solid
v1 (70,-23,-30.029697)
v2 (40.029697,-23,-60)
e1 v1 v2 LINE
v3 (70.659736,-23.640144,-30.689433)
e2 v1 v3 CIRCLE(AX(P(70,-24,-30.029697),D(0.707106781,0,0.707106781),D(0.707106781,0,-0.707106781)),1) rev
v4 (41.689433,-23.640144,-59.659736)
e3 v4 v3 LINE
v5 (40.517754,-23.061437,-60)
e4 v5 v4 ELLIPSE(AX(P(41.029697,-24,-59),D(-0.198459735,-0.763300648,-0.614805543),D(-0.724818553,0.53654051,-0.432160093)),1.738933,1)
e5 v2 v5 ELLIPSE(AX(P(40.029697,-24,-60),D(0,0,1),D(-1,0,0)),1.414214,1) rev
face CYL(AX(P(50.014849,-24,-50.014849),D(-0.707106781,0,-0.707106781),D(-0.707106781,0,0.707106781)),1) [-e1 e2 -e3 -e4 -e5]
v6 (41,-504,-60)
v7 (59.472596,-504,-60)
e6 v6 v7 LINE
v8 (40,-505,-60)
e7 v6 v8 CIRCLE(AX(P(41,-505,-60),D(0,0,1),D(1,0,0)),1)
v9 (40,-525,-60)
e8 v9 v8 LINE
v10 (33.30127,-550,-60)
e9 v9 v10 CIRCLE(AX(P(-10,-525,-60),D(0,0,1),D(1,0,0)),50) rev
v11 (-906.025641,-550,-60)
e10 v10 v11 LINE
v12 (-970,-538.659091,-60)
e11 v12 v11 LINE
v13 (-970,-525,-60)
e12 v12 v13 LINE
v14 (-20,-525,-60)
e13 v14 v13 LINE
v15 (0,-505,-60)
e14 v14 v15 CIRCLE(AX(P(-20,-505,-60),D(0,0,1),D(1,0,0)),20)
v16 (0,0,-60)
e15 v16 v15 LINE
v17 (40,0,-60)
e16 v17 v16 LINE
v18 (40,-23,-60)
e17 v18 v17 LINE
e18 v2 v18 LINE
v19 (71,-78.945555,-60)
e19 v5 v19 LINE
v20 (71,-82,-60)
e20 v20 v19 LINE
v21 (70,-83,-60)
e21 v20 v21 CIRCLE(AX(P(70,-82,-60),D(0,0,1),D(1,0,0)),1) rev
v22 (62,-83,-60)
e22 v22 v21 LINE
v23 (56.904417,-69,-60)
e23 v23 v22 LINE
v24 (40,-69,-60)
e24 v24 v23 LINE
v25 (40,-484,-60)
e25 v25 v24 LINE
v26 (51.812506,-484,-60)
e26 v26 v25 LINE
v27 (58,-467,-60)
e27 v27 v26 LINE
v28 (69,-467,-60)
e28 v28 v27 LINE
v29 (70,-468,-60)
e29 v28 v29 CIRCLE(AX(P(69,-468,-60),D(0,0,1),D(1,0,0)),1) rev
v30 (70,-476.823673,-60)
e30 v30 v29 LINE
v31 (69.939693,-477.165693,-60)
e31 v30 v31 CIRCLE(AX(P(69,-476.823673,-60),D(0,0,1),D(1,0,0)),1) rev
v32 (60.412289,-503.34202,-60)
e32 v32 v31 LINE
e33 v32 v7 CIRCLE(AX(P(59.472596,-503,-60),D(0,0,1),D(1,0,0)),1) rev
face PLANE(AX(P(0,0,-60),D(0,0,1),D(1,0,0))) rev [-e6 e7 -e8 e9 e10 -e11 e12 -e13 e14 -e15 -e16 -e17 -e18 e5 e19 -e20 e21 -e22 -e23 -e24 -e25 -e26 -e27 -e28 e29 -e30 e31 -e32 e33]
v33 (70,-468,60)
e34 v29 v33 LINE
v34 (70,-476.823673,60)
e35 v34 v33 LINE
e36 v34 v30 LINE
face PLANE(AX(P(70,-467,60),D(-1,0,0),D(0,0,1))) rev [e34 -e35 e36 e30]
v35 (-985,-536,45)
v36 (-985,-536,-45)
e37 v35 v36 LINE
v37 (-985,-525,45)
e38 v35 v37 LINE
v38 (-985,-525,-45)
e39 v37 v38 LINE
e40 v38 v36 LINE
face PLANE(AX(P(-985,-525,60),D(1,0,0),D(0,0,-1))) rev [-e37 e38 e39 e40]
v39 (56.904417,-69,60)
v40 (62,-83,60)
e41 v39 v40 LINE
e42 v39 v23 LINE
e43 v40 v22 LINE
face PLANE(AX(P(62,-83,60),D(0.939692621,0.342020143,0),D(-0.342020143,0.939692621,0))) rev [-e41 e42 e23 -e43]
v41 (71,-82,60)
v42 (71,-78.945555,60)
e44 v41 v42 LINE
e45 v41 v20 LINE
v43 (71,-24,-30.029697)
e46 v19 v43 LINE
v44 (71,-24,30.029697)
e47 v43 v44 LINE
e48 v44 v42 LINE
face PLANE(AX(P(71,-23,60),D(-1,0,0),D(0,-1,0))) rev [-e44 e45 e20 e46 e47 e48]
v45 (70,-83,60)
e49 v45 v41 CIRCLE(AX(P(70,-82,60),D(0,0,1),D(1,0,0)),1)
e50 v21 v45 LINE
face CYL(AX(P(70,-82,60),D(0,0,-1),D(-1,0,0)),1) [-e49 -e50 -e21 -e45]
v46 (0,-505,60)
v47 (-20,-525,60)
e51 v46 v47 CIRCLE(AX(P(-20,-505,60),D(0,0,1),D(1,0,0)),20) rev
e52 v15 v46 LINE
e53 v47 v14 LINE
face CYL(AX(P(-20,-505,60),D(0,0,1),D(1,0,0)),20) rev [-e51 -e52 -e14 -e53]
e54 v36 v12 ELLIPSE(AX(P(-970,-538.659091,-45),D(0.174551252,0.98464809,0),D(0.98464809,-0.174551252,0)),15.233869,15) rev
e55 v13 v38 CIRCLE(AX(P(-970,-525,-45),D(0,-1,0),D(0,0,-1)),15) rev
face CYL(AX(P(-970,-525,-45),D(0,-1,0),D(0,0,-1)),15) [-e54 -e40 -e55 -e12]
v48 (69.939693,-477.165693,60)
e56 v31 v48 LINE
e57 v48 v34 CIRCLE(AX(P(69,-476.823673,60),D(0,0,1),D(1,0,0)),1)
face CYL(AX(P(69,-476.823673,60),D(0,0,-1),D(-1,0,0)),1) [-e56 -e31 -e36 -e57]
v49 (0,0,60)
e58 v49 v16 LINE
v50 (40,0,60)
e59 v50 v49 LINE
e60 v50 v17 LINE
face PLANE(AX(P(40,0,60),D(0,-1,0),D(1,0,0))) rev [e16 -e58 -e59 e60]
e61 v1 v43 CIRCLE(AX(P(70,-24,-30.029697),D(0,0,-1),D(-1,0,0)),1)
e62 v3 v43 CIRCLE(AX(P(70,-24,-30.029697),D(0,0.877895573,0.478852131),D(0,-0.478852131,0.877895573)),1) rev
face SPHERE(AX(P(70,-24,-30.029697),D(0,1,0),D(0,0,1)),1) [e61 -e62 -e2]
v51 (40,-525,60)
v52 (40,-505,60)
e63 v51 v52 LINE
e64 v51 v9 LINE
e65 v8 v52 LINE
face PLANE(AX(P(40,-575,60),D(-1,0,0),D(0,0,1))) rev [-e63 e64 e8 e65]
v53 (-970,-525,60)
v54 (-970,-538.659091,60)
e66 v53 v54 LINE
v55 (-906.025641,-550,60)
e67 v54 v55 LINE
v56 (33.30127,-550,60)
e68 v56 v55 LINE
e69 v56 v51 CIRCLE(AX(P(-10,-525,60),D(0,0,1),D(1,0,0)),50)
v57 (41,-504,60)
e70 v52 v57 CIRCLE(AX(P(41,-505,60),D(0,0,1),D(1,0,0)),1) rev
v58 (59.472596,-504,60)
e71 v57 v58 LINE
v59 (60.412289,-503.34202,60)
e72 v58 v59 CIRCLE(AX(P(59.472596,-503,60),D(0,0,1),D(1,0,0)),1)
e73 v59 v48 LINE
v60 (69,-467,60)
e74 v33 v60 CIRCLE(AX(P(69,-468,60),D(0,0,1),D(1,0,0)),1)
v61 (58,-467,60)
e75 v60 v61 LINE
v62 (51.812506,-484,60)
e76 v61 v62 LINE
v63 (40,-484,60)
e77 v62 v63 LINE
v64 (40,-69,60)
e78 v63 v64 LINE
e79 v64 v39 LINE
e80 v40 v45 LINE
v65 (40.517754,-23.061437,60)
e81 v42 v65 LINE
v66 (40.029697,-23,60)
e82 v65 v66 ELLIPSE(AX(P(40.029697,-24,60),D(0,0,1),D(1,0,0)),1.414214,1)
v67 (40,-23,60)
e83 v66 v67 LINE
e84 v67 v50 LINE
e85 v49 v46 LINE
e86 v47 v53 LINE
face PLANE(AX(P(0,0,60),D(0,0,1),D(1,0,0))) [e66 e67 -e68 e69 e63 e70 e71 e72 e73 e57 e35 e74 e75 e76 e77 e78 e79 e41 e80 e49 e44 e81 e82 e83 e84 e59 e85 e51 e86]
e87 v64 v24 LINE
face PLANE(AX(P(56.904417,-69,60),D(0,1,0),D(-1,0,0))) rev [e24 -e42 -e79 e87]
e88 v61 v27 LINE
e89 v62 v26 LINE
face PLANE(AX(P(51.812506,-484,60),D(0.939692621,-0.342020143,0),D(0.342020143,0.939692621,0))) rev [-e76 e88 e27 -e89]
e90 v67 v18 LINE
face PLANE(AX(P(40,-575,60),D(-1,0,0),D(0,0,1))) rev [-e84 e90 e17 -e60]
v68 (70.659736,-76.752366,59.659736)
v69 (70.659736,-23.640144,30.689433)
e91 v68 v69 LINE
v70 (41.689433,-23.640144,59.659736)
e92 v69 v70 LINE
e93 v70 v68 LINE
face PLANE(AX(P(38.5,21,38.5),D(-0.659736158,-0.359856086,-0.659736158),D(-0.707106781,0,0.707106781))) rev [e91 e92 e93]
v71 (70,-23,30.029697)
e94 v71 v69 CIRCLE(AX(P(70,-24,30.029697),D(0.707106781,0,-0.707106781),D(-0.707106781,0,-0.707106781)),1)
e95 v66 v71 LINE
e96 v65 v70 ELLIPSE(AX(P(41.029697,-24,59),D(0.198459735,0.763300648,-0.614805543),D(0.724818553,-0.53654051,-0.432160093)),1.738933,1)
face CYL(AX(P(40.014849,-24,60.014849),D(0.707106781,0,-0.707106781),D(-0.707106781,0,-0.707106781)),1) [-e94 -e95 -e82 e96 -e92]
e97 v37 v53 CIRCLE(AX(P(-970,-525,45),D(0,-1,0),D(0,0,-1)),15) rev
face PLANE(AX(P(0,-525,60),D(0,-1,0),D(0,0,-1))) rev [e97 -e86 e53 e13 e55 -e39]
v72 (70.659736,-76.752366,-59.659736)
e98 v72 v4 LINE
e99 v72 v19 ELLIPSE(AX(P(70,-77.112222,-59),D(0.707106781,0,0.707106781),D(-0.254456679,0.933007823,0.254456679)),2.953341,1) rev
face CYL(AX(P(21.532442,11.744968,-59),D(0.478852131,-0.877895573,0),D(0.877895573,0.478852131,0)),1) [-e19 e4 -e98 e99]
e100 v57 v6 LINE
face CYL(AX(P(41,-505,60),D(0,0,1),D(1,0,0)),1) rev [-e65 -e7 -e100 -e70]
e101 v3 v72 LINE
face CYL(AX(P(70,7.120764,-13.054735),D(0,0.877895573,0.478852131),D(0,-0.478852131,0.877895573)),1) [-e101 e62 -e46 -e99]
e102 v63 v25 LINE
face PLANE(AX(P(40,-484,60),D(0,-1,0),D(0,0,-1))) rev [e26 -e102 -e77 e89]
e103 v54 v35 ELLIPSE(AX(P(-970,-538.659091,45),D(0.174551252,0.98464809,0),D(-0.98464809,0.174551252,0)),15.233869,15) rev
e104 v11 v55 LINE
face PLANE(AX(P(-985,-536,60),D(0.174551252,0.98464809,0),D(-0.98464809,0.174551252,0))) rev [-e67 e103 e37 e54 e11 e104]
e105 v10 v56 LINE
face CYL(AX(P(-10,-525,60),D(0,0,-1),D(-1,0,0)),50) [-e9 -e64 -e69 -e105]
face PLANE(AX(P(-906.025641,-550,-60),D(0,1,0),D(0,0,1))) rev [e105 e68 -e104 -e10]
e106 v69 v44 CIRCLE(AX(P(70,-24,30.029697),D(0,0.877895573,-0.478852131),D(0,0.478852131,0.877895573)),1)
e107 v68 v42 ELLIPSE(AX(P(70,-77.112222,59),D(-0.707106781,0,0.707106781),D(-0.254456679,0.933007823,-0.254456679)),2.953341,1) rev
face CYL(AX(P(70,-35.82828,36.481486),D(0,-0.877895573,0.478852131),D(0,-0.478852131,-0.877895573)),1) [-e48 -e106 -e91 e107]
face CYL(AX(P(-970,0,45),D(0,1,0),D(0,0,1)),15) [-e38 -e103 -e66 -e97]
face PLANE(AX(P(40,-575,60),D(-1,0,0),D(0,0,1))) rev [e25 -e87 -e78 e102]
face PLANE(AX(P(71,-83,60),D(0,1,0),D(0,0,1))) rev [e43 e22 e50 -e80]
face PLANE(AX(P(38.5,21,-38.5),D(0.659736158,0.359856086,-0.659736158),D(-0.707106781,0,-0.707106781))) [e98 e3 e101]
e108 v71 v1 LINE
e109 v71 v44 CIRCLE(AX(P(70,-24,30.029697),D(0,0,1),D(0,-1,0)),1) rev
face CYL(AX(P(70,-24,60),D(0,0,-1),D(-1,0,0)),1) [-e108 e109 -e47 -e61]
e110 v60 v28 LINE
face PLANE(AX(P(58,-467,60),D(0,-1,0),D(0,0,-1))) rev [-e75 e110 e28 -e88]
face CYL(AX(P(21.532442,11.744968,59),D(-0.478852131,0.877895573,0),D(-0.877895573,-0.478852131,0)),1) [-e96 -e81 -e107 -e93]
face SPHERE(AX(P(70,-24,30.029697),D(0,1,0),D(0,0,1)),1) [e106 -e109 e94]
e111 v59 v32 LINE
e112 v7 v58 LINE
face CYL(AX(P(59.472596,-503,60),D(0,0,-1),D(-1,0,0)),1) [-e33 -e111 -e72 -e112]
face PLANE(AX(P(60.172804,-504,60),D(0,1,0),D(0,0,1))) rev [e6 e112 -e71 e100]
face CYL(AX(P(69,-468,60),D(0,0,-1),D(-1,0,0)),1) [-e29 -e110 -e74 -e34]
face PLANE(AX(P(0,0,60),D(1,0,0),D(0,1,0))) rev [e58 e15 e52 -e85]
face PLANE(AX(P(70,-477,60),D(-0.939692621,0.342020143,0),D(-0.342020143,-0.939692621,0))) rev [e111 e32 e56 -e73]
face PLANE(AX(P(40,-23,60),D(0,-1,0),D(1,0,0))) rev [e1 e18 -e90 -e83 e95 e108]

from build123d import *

# Parameters (mm, degrees)
BOSS_EXTRUDE1_DEPTH = 60
FILLET1_R           = 20
FILLET2_R           = 50
SKETCH2_W           = 946.025641026
SKETCH2_H           = 25
CUT_EXTRUDE1_DEPTH  = 1147.843494118
FILLET3_R           = 15
BOSS_EXTRUDE2_DEPTH = 60
CHAMFER1_START      = 58.356662002
CHAMFER1_OUTLINE_W  = 43
CHAMFER1_OUTLINE_H  = 66
CHAMFER1_DEPTH      = 20.643337998
CHAMFER2_START      = 58.356662002
CHAMFER2_OUTLINE_W  = 43
CHAMFER2_OUTLINE_H  = 66
CHAMFER2_DEPTH      = 20.643337998
FILLET4_R           = 1


with BuildPart() as part:
    # Sketch1 → Boss-Extrude1 (new, symmetric)
    with BuildSketch(Plane.XY):
        Polygon((0, 0), (0, -525), (-985, -525), (-985, -536), (-765, -575), (40, -575), (40, 0), align=None)
    extrude(amount=BOSS_EXTRUDE1_DEPTH, both=True)

    # Fillet1
    fillet1_edges = [part.edges().sort_by_distance(p)[0] for p in [
        (0, -525, 0),
    ]]
    fillet(fillet1_edges, radius=FILLET1_R)

    # Fillet2
    fillet2_edges = [part.edges().sort_by_distance(p)[0] for p in [
        (40, -575, 0),
    ]]
    fillet(fillet2_edges, radius=FILLET2_R)

    # Sketch2 → Cut-Extrude1 (cut, through all)
    with BuildSketch(Plane.XY.offset(60)):
        with Locations((-433.012820513, -562.5)):
            Rectangle(SKETCH2_W, SKETCH2_H)
    extrude(amount=-CUT_EXTRUDE1_DEPTH, mode=Mode.SUBTRACT)

    # Fillet3
    fillet3_edges = [part.edges().sort_by_distance(p)[0] for p in [
        (-985, -530.5, 60),
        (-985, -530.5, -60),
    ]]
    fillet(fillet3_edges, radius=FILLET3_R)

    # Sketch4 → Boss-Extrude2 (add, symmetric)
    with BuildSketch(Plane.XY):
        Polygon((40, -23), (71, -23), (71, -83), (62, -83), (56.90441672, -69), (40, -69), align=None)
        Polygon((40, -484), (51.812506017, -484), (58, -467), (70, -467), (70, -477), (60.172803675, -504), (40, -504), align=None)
    extrude(amount=BOSS_EXTRUDE2_DEPTH, both=True)

    # Chamfer1: read off the stored shape, not the designer's step
    # Chamfer1 outline → Chamfer1 (cut)
    with BuildSketch(Plane(origin=(0, 0, 0), x_dir=(0.7514973063417119, -0.31591606508632464, -0.5791794526582624), z_dir=(0.659736158294474, 0.35985608634244, 0.659736158294474)).offset(CHAMFER1_START)):
        with Locations((23.5, -66)):
            Rectangle(CHAMFER1_OUTLINE_W, CHAMFER1_OUTLINE_H)
    extrude(amount=CHAMFER1_DEPTH, mode=Mode.SUBTRACT)

    # Chamfer2: read off the stored shape, not the designer's step
    # Chamfer2 outline → Chamfer2 (cut)
    with BuildSketch(Plane(origin=(0, 0, 0), x_dir=(0.7514973063417119, -0.31591606508632464, 0.5791794526582624), z_dir=(0.659736158294474, 0.35985608634244, -0.659736158294474)).offset(CHAMFER2_START)):
        with Locations((23.5, 66)):
            Rectangle(CHAMFER2_OUTLINE_W, CHAMFER2_OUTLINE_H)
    extrude(amount=CHAMFER2_DEPTH, mode=Mode.SUBTRACT)

    # Fillet4
    fillet4_edges = [part.edges().sort_by_distance(p)[0] for p in [
        (56, -50.5, 60),
        (71, -23, 0),
        (71, -50.5, 45),
        (56, -23, 45),
        (56, -23, -45),
        (71, -50.5, -45),
        (56, -50.5, -60),
        (71, -83, 0),
        (40, -504, 0),
        (60.172803675, -504, 0),
        (70, -477, 0),
        (70, -467, 0),
    ]]
    fillet(fillet4_edges, radius=FILLET4_R)


solid = part.part
